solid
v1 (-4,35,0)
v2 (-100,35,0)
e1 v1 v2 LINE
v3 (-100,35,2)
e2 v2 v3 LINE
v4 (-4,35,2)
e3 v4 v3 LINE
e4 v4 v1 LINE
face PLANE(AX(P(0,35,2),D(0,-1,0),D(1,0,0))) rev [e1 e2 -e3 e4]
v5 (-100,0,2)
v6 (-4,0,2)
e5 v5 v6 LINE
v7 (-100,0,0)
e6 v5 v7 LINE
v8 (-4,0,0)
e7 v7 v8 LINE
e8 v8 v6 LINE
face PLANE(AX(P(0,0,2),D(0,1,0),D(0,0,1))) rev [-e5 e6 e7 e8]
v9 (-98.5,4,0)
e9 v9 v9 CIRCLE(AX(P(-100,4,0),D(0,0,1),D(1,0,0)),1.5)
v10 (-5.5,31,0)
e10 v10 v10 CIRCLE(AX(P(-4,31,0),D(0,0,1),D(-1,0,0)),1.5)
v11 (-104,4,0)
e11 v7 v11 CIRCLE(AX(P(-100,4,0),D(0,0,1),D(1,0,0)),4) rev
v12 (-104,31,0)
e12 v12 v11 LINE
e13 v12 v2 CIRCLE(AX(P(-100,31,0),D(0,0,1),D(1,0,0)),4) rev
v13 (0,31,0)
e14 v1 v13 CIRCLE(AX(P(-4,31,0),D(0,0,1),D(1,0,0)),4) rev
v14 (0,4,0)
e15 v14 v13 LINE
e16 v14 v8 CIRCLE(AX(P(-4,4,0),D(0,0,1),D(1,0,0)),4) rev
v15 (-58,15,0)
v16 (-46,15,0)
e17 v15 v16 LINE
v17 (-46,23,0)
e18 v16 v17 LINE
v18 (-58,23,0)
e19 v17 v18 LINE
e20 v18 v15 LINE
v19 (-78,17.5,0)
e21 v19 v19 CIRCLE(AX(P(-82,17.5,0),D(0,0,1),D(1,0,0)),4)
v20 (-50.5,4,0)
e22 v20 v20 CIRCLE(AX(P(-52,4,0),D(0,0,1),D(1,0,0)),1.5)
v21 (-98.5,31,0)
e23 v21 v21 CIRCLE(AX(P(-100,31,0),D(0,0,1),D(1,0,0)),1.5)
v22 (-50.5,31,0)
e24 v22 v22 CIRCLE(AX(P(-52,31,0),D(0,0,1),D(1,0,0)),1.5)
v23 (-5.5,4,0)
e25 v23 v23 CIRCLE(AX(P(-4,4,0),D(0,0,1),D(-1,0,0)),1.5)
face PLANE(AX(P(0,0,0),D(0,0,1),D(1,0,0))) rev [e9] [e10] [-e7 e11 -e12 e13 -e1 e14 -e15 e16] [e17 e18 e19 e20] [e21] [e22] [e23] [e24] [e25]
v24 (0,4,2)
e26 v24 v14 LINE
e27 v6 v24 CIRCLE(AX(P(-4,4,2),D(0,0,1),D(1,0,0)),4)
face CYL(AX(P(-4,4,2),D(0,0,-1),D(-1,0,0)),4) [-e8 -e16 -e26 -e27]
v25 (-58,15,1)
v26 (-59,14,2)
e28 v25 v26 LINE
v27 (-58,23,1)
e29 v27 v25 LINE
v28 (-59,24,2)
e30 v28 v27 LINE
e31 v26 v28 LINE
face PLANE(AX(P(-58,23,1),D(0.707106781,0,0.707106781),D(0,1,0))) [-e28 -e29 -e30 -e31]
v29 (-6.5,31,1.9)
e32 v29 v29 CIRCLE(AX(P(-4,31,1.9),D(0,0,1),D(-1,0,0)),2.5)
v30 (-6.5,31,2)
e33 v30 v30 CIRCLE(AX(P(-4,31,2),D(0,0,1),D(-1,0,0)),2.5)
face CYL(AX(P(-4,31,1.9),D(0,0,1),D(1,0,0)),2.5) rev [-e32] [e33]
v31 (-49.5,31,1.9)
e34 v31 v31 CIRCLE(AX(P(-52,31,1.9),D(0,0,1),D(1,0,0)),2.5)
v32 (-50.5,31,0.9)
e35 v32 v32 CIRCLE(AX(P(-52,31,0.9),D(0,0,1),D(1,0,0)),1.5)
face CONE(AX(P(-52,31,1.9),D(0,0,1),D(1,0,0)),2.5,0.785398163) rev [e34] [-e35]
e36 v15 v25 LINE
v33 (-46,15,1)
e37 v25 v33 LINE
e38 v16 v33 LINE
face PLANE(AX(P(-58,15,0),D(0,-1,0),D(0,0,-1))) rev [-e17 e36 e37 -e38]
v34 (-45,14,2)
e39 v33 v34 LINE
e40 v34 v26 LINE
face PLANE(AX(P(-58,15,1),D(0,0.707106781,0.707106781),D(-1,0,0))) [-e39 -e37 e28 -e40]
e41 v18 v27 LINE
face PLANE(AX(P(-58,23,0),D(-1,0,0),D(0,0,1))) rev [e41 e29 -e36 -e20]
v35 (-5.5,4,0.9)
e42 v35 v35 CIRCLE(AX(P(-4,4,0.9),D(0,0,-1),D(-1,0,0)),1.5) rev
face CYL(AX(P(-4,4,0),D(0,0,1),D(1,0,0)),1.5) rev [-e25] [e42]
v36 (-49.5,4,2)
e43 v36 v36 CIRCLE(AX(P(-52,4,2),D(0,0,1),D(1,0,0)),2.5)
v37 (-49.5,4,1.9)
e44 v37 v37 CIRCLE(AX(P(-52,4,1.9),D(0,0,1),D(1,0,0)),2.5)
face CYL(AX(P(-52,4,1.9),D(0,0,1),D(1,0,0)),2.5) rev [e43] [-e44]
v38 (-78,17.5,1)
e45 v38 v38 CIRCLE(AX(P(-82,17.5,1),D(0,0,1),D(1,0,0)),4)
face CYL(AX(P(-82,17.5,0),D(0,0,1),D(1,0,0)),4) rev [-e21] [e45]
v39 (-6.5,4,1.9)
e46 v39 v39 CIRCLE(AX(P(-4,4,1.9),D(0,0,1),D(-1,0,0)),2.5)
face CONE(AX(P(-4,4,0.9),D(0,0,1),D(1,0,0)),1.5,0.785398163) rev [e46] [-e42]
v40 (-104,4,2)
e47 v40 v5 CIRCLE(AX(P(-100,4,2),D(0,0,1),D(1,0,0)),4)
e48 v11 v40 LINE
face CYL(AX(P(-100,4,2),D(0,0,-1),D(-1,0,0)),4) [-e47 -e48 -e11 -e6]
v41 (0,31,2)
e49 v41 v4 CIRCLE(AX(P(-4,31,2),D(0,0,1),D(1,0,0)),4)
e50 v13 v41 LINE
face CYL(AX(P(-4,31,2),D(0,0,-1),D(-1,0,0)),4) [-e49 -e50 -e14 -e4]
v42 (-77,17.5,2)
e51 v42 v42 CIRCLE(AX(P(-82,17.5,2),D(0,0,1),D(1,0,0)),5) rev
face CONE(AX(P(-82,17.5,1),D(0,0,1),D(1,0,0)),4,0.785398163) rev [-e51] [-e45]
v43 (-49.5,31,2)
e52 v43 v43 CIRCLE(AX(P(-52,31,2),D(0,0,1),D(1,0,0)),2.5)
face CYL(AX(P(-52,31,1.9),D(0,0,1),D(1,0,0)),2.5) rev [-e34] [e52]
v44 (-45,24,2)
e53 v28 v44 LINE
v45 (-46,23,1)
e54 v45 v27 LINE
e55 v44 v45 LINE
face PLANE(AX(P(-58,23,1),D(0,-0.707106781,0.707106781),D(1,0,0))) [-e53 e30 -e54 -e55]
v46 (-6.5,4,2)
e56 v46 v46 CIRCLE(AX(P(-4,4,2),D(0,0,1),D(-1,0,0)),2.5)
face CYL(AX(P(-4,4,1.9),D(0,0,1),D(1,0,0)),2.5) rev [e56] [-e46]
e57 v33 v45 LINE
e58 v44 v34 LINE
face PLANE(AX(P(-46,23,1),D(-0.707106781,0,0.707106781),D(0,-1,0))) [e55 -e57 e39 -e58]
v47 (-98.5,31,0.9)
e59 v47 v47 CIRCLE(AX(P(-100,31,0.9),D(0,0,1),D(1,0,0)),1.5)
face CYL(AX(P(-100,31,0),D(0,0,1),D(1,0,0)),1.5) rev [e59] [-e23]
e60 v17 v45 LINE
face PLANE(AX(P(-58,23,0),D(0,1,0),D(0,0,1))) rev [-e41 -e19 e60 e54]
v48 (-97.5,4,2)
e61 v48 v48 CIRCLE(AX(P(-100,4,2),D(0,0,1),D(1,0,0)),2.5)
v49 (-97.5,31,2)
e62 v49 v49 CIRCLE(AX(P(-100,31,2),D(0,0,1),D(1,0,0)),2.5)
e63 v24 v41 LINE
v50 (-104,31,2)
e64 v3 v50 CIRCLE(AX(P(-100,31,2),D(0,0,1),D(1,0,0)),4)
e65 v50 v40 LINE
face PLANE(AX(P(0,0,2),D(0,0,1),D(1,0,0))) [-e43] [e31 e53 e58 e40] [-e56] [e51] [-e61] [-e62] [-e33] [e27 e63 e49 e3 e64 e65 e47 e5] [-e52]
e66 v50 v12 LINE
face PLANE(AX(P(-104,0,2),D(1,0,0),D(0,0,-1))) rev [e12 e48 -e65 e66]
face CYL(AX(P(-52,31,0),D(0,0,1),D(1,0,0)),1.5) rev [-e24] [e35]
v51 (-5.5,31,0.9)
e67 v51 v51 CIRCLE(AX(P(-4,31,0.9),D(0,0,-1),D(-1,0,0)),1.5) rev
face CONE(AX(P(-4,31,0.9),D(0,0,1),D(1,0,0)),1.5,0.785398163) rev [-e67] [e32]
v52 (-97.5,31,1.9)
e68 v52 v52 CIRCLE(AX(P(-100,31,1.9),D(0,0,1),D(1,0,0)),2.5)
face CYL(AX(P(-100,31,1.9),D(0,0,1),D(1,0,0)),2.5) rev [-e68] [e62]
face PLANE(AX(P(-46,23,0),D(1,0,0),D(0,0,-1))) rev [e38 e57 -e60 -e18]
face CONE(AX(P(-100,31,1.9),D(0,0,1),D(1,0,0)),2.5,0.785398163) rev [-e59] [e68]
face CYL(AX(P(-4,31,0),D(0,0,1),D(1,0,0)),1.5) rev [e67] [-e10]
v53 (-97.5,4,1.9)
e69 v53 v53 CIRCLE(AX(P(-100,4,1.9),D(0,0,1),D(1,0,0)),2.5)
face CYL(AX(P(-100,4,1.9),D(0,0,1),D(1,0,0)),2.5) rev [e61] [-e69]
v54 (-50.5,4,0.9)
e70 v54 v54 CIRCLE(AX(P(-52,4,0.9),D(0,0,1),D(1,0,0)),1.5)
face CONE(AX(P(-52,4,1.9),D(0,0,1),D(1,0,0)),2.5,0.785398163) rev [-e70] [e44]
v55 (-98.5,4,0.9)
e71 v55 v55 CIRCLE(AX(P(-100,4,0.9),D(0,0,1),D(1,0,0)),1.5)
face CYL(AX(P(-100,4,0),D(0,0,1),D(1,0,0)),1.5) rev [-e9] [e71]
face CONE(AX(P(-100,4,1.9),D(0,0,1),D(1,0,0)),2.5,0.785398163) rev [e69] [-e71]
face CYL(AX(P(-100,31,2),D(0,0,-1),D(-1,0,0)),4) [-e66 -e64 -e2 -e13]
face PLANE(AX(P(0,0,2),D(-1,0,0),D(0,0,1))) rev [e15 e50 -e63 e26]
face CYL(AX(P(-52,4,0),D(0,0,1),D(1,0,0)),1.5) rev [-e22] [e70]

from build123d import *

# Parameters (mm, degrees)
IZIM1_W                     = 104
IZIM1_H                     = 35
Y_KSEKLIK_EKSTR_ZYON1_DEPTH = 2
IZIM2_R                     = 1.5
KES_EKSTR_ZYON1_DEPTH       = 2
IZIM3_R                     = 2.5
KES_EKSTR_ZYON2_DEPTH       = 0.1
PAH2_SIZE                   = 1
IZIM4_R                     = 1.5
KES_EKSTR_ZYON3_DEPTH       = 2
IZIM5_R                     = 2.5
KES_EKSTR_ZYON4_DEPTH       = 0.1
PAH3_SIZE                   = 1
RADYUS1_R                   = 4
IZIM6_R                     = 4
IZIM6_W                     = 12
IZIM6_H                     = 8
KES_EKSTR_ZYON5_DEPTH       = 2
PAH4_SIZE                   = 1
PAH5_SIZE                   = 1


with BuildPart() as part:
    # Çizim1 → Yükseklik-Ekstrüzyon1 (new body)
    with BuildSketch(Plane.XY):
        with Locations((-52, 17.5)):
            Rectangle(IZIM1_W, IZIM1_H)
    extrude(amount=Y_KSEKLIK_EKSTR_ZYON1_DEPTH)

    # Çizim2 → Kes-Ekstrüzyon1 (cut)
    with BuildSketch(Plane.XY.offset(2)):
        with Locations((-100, 31)):
            Circle(IZIM2_R)
        with Locations((-100, 4)):
            Circle(IZIM2_R)
        with Locations(Location((-4, 4, 0), (0, 0, 180))):
            Circle(IZIM2_R)
        with Locations(Location((-4, 31, 0), (0, 0, 180))):
            Circle(IZIM2_R)
    extrude(amount=-KES_EKSTR_ZYON1_DEPTH, mode=Mode.SUBTRACT)

    # Çizim3 → Kes-Ekstrüzyon2 (cut)
    with BuildSketch(Plane.XY.offset(2)):
        with Locations((-100, 31)):
            Circle(IZIM3_R)
        with Locations((-100, 4)):
            Circle(IZIM3_R)
        with Locations(Location((-4, 4, 0), (0, 0, 180))):
            Circle(IZIM3_R)
        with Locations(Location((-4, 31, 0), (0, 0, 180))):
            Circle(IZIM3_R)
    extrude(amount=-KES_EKSTR_ZYON2_DEPTH, mode=Mode.SUBTRACT)

    # Pah2
    pah2_edges = [part.edges().sort_by_distance(p)[0] for p in [
        (-2.5, 31, 1.9),
        (-2.5, 4, 1.9),
        (-101.5, 4, 1.9),
        (-101.5, 31, 1.9),
    ]]
    chamfer(pah2_edges, length=PAH2_SIZE - 0.0001)  # a hair under: the kernel refuses the full size

    # Çizim4 → Kes-Ekstrüzyon3 (cut)
    with BuildSketch(Plane.XY.offset(2)):
        with Locations((-52, 31)):
            Circle(IZIM4_R)
        with Locations((-52, 4)):
            Circle(IZIM4_R)
    extrude(amount=-KES_EKSTR_ZYON3_DEPTH, mode=Mode.SUBTRACT)

    # Çizim5 → Kes-Ekstrüzyon4 (cut)
    with BuildSketch(Plane.XY.offset(2)):
        with Locations((-52, 31)):
            Circle(IZIM5_R)
        with Locations((-52, 4)):
            Circle(IZIM5_R)
    extrude(amount=-KES_EKSTR_ZYON4_DEPTH, mode=Mode.SUBTRACT)

    # Pah3
    pah3_edges = [part.edges().sort_by_distance(p)[0] for p in [
        (-53.5, 31, 1.9),
        (-53.5, 4, 1.9),
    ]]
    chamfer(pah3_edges, length=PAH3_SIZE - 0.0001)  # a hair under: the kernel refuses the full size

    # Radyus1
    radyus1_edges = [part.edges().sort_by_distance(p)[0] for p in [
        (0, 0, 1),
        (-104, 0, 1),
        (-104, 35, 1),
        (0, 35, 1),
    ]]
    fillet(radyus1_edges, radius=RADYUS1_R)

    # Çizim6 → Kes-Ekstrüzyon5 (cut)
    with BuildSketch(Plane.XY.offset(2)):
        with Locations((-82, 17.5)):
            Circle(IZIM6_R)
        with Locations((-52, 19)):
            Rectangle(IZIM6_W, IZIM6_H)
    extrude(amount=-KES_EKSTR_ZYON5_DEPTH, mode=Mode.SUBTRACT)

    # Pah4
    pah4_edges = [part.edges().sort_by_distance(p)[0] for p in [
        (-58, 19, 2),
        (-52, 15, 2),
        (-46, 19, 2),
        (-52, 23, 2),
    ]]
    chamfer(pah4_edges, length=PAH4_SIZE)

    # Pah5
    pah5_edges = [part.edges().sort_by_distance(p)[0] for p in [
        (-86, 17.5, 2),
    ]]
    chamfer(pah5_edges, length=PAH5_SIZE)


solid = part.part
